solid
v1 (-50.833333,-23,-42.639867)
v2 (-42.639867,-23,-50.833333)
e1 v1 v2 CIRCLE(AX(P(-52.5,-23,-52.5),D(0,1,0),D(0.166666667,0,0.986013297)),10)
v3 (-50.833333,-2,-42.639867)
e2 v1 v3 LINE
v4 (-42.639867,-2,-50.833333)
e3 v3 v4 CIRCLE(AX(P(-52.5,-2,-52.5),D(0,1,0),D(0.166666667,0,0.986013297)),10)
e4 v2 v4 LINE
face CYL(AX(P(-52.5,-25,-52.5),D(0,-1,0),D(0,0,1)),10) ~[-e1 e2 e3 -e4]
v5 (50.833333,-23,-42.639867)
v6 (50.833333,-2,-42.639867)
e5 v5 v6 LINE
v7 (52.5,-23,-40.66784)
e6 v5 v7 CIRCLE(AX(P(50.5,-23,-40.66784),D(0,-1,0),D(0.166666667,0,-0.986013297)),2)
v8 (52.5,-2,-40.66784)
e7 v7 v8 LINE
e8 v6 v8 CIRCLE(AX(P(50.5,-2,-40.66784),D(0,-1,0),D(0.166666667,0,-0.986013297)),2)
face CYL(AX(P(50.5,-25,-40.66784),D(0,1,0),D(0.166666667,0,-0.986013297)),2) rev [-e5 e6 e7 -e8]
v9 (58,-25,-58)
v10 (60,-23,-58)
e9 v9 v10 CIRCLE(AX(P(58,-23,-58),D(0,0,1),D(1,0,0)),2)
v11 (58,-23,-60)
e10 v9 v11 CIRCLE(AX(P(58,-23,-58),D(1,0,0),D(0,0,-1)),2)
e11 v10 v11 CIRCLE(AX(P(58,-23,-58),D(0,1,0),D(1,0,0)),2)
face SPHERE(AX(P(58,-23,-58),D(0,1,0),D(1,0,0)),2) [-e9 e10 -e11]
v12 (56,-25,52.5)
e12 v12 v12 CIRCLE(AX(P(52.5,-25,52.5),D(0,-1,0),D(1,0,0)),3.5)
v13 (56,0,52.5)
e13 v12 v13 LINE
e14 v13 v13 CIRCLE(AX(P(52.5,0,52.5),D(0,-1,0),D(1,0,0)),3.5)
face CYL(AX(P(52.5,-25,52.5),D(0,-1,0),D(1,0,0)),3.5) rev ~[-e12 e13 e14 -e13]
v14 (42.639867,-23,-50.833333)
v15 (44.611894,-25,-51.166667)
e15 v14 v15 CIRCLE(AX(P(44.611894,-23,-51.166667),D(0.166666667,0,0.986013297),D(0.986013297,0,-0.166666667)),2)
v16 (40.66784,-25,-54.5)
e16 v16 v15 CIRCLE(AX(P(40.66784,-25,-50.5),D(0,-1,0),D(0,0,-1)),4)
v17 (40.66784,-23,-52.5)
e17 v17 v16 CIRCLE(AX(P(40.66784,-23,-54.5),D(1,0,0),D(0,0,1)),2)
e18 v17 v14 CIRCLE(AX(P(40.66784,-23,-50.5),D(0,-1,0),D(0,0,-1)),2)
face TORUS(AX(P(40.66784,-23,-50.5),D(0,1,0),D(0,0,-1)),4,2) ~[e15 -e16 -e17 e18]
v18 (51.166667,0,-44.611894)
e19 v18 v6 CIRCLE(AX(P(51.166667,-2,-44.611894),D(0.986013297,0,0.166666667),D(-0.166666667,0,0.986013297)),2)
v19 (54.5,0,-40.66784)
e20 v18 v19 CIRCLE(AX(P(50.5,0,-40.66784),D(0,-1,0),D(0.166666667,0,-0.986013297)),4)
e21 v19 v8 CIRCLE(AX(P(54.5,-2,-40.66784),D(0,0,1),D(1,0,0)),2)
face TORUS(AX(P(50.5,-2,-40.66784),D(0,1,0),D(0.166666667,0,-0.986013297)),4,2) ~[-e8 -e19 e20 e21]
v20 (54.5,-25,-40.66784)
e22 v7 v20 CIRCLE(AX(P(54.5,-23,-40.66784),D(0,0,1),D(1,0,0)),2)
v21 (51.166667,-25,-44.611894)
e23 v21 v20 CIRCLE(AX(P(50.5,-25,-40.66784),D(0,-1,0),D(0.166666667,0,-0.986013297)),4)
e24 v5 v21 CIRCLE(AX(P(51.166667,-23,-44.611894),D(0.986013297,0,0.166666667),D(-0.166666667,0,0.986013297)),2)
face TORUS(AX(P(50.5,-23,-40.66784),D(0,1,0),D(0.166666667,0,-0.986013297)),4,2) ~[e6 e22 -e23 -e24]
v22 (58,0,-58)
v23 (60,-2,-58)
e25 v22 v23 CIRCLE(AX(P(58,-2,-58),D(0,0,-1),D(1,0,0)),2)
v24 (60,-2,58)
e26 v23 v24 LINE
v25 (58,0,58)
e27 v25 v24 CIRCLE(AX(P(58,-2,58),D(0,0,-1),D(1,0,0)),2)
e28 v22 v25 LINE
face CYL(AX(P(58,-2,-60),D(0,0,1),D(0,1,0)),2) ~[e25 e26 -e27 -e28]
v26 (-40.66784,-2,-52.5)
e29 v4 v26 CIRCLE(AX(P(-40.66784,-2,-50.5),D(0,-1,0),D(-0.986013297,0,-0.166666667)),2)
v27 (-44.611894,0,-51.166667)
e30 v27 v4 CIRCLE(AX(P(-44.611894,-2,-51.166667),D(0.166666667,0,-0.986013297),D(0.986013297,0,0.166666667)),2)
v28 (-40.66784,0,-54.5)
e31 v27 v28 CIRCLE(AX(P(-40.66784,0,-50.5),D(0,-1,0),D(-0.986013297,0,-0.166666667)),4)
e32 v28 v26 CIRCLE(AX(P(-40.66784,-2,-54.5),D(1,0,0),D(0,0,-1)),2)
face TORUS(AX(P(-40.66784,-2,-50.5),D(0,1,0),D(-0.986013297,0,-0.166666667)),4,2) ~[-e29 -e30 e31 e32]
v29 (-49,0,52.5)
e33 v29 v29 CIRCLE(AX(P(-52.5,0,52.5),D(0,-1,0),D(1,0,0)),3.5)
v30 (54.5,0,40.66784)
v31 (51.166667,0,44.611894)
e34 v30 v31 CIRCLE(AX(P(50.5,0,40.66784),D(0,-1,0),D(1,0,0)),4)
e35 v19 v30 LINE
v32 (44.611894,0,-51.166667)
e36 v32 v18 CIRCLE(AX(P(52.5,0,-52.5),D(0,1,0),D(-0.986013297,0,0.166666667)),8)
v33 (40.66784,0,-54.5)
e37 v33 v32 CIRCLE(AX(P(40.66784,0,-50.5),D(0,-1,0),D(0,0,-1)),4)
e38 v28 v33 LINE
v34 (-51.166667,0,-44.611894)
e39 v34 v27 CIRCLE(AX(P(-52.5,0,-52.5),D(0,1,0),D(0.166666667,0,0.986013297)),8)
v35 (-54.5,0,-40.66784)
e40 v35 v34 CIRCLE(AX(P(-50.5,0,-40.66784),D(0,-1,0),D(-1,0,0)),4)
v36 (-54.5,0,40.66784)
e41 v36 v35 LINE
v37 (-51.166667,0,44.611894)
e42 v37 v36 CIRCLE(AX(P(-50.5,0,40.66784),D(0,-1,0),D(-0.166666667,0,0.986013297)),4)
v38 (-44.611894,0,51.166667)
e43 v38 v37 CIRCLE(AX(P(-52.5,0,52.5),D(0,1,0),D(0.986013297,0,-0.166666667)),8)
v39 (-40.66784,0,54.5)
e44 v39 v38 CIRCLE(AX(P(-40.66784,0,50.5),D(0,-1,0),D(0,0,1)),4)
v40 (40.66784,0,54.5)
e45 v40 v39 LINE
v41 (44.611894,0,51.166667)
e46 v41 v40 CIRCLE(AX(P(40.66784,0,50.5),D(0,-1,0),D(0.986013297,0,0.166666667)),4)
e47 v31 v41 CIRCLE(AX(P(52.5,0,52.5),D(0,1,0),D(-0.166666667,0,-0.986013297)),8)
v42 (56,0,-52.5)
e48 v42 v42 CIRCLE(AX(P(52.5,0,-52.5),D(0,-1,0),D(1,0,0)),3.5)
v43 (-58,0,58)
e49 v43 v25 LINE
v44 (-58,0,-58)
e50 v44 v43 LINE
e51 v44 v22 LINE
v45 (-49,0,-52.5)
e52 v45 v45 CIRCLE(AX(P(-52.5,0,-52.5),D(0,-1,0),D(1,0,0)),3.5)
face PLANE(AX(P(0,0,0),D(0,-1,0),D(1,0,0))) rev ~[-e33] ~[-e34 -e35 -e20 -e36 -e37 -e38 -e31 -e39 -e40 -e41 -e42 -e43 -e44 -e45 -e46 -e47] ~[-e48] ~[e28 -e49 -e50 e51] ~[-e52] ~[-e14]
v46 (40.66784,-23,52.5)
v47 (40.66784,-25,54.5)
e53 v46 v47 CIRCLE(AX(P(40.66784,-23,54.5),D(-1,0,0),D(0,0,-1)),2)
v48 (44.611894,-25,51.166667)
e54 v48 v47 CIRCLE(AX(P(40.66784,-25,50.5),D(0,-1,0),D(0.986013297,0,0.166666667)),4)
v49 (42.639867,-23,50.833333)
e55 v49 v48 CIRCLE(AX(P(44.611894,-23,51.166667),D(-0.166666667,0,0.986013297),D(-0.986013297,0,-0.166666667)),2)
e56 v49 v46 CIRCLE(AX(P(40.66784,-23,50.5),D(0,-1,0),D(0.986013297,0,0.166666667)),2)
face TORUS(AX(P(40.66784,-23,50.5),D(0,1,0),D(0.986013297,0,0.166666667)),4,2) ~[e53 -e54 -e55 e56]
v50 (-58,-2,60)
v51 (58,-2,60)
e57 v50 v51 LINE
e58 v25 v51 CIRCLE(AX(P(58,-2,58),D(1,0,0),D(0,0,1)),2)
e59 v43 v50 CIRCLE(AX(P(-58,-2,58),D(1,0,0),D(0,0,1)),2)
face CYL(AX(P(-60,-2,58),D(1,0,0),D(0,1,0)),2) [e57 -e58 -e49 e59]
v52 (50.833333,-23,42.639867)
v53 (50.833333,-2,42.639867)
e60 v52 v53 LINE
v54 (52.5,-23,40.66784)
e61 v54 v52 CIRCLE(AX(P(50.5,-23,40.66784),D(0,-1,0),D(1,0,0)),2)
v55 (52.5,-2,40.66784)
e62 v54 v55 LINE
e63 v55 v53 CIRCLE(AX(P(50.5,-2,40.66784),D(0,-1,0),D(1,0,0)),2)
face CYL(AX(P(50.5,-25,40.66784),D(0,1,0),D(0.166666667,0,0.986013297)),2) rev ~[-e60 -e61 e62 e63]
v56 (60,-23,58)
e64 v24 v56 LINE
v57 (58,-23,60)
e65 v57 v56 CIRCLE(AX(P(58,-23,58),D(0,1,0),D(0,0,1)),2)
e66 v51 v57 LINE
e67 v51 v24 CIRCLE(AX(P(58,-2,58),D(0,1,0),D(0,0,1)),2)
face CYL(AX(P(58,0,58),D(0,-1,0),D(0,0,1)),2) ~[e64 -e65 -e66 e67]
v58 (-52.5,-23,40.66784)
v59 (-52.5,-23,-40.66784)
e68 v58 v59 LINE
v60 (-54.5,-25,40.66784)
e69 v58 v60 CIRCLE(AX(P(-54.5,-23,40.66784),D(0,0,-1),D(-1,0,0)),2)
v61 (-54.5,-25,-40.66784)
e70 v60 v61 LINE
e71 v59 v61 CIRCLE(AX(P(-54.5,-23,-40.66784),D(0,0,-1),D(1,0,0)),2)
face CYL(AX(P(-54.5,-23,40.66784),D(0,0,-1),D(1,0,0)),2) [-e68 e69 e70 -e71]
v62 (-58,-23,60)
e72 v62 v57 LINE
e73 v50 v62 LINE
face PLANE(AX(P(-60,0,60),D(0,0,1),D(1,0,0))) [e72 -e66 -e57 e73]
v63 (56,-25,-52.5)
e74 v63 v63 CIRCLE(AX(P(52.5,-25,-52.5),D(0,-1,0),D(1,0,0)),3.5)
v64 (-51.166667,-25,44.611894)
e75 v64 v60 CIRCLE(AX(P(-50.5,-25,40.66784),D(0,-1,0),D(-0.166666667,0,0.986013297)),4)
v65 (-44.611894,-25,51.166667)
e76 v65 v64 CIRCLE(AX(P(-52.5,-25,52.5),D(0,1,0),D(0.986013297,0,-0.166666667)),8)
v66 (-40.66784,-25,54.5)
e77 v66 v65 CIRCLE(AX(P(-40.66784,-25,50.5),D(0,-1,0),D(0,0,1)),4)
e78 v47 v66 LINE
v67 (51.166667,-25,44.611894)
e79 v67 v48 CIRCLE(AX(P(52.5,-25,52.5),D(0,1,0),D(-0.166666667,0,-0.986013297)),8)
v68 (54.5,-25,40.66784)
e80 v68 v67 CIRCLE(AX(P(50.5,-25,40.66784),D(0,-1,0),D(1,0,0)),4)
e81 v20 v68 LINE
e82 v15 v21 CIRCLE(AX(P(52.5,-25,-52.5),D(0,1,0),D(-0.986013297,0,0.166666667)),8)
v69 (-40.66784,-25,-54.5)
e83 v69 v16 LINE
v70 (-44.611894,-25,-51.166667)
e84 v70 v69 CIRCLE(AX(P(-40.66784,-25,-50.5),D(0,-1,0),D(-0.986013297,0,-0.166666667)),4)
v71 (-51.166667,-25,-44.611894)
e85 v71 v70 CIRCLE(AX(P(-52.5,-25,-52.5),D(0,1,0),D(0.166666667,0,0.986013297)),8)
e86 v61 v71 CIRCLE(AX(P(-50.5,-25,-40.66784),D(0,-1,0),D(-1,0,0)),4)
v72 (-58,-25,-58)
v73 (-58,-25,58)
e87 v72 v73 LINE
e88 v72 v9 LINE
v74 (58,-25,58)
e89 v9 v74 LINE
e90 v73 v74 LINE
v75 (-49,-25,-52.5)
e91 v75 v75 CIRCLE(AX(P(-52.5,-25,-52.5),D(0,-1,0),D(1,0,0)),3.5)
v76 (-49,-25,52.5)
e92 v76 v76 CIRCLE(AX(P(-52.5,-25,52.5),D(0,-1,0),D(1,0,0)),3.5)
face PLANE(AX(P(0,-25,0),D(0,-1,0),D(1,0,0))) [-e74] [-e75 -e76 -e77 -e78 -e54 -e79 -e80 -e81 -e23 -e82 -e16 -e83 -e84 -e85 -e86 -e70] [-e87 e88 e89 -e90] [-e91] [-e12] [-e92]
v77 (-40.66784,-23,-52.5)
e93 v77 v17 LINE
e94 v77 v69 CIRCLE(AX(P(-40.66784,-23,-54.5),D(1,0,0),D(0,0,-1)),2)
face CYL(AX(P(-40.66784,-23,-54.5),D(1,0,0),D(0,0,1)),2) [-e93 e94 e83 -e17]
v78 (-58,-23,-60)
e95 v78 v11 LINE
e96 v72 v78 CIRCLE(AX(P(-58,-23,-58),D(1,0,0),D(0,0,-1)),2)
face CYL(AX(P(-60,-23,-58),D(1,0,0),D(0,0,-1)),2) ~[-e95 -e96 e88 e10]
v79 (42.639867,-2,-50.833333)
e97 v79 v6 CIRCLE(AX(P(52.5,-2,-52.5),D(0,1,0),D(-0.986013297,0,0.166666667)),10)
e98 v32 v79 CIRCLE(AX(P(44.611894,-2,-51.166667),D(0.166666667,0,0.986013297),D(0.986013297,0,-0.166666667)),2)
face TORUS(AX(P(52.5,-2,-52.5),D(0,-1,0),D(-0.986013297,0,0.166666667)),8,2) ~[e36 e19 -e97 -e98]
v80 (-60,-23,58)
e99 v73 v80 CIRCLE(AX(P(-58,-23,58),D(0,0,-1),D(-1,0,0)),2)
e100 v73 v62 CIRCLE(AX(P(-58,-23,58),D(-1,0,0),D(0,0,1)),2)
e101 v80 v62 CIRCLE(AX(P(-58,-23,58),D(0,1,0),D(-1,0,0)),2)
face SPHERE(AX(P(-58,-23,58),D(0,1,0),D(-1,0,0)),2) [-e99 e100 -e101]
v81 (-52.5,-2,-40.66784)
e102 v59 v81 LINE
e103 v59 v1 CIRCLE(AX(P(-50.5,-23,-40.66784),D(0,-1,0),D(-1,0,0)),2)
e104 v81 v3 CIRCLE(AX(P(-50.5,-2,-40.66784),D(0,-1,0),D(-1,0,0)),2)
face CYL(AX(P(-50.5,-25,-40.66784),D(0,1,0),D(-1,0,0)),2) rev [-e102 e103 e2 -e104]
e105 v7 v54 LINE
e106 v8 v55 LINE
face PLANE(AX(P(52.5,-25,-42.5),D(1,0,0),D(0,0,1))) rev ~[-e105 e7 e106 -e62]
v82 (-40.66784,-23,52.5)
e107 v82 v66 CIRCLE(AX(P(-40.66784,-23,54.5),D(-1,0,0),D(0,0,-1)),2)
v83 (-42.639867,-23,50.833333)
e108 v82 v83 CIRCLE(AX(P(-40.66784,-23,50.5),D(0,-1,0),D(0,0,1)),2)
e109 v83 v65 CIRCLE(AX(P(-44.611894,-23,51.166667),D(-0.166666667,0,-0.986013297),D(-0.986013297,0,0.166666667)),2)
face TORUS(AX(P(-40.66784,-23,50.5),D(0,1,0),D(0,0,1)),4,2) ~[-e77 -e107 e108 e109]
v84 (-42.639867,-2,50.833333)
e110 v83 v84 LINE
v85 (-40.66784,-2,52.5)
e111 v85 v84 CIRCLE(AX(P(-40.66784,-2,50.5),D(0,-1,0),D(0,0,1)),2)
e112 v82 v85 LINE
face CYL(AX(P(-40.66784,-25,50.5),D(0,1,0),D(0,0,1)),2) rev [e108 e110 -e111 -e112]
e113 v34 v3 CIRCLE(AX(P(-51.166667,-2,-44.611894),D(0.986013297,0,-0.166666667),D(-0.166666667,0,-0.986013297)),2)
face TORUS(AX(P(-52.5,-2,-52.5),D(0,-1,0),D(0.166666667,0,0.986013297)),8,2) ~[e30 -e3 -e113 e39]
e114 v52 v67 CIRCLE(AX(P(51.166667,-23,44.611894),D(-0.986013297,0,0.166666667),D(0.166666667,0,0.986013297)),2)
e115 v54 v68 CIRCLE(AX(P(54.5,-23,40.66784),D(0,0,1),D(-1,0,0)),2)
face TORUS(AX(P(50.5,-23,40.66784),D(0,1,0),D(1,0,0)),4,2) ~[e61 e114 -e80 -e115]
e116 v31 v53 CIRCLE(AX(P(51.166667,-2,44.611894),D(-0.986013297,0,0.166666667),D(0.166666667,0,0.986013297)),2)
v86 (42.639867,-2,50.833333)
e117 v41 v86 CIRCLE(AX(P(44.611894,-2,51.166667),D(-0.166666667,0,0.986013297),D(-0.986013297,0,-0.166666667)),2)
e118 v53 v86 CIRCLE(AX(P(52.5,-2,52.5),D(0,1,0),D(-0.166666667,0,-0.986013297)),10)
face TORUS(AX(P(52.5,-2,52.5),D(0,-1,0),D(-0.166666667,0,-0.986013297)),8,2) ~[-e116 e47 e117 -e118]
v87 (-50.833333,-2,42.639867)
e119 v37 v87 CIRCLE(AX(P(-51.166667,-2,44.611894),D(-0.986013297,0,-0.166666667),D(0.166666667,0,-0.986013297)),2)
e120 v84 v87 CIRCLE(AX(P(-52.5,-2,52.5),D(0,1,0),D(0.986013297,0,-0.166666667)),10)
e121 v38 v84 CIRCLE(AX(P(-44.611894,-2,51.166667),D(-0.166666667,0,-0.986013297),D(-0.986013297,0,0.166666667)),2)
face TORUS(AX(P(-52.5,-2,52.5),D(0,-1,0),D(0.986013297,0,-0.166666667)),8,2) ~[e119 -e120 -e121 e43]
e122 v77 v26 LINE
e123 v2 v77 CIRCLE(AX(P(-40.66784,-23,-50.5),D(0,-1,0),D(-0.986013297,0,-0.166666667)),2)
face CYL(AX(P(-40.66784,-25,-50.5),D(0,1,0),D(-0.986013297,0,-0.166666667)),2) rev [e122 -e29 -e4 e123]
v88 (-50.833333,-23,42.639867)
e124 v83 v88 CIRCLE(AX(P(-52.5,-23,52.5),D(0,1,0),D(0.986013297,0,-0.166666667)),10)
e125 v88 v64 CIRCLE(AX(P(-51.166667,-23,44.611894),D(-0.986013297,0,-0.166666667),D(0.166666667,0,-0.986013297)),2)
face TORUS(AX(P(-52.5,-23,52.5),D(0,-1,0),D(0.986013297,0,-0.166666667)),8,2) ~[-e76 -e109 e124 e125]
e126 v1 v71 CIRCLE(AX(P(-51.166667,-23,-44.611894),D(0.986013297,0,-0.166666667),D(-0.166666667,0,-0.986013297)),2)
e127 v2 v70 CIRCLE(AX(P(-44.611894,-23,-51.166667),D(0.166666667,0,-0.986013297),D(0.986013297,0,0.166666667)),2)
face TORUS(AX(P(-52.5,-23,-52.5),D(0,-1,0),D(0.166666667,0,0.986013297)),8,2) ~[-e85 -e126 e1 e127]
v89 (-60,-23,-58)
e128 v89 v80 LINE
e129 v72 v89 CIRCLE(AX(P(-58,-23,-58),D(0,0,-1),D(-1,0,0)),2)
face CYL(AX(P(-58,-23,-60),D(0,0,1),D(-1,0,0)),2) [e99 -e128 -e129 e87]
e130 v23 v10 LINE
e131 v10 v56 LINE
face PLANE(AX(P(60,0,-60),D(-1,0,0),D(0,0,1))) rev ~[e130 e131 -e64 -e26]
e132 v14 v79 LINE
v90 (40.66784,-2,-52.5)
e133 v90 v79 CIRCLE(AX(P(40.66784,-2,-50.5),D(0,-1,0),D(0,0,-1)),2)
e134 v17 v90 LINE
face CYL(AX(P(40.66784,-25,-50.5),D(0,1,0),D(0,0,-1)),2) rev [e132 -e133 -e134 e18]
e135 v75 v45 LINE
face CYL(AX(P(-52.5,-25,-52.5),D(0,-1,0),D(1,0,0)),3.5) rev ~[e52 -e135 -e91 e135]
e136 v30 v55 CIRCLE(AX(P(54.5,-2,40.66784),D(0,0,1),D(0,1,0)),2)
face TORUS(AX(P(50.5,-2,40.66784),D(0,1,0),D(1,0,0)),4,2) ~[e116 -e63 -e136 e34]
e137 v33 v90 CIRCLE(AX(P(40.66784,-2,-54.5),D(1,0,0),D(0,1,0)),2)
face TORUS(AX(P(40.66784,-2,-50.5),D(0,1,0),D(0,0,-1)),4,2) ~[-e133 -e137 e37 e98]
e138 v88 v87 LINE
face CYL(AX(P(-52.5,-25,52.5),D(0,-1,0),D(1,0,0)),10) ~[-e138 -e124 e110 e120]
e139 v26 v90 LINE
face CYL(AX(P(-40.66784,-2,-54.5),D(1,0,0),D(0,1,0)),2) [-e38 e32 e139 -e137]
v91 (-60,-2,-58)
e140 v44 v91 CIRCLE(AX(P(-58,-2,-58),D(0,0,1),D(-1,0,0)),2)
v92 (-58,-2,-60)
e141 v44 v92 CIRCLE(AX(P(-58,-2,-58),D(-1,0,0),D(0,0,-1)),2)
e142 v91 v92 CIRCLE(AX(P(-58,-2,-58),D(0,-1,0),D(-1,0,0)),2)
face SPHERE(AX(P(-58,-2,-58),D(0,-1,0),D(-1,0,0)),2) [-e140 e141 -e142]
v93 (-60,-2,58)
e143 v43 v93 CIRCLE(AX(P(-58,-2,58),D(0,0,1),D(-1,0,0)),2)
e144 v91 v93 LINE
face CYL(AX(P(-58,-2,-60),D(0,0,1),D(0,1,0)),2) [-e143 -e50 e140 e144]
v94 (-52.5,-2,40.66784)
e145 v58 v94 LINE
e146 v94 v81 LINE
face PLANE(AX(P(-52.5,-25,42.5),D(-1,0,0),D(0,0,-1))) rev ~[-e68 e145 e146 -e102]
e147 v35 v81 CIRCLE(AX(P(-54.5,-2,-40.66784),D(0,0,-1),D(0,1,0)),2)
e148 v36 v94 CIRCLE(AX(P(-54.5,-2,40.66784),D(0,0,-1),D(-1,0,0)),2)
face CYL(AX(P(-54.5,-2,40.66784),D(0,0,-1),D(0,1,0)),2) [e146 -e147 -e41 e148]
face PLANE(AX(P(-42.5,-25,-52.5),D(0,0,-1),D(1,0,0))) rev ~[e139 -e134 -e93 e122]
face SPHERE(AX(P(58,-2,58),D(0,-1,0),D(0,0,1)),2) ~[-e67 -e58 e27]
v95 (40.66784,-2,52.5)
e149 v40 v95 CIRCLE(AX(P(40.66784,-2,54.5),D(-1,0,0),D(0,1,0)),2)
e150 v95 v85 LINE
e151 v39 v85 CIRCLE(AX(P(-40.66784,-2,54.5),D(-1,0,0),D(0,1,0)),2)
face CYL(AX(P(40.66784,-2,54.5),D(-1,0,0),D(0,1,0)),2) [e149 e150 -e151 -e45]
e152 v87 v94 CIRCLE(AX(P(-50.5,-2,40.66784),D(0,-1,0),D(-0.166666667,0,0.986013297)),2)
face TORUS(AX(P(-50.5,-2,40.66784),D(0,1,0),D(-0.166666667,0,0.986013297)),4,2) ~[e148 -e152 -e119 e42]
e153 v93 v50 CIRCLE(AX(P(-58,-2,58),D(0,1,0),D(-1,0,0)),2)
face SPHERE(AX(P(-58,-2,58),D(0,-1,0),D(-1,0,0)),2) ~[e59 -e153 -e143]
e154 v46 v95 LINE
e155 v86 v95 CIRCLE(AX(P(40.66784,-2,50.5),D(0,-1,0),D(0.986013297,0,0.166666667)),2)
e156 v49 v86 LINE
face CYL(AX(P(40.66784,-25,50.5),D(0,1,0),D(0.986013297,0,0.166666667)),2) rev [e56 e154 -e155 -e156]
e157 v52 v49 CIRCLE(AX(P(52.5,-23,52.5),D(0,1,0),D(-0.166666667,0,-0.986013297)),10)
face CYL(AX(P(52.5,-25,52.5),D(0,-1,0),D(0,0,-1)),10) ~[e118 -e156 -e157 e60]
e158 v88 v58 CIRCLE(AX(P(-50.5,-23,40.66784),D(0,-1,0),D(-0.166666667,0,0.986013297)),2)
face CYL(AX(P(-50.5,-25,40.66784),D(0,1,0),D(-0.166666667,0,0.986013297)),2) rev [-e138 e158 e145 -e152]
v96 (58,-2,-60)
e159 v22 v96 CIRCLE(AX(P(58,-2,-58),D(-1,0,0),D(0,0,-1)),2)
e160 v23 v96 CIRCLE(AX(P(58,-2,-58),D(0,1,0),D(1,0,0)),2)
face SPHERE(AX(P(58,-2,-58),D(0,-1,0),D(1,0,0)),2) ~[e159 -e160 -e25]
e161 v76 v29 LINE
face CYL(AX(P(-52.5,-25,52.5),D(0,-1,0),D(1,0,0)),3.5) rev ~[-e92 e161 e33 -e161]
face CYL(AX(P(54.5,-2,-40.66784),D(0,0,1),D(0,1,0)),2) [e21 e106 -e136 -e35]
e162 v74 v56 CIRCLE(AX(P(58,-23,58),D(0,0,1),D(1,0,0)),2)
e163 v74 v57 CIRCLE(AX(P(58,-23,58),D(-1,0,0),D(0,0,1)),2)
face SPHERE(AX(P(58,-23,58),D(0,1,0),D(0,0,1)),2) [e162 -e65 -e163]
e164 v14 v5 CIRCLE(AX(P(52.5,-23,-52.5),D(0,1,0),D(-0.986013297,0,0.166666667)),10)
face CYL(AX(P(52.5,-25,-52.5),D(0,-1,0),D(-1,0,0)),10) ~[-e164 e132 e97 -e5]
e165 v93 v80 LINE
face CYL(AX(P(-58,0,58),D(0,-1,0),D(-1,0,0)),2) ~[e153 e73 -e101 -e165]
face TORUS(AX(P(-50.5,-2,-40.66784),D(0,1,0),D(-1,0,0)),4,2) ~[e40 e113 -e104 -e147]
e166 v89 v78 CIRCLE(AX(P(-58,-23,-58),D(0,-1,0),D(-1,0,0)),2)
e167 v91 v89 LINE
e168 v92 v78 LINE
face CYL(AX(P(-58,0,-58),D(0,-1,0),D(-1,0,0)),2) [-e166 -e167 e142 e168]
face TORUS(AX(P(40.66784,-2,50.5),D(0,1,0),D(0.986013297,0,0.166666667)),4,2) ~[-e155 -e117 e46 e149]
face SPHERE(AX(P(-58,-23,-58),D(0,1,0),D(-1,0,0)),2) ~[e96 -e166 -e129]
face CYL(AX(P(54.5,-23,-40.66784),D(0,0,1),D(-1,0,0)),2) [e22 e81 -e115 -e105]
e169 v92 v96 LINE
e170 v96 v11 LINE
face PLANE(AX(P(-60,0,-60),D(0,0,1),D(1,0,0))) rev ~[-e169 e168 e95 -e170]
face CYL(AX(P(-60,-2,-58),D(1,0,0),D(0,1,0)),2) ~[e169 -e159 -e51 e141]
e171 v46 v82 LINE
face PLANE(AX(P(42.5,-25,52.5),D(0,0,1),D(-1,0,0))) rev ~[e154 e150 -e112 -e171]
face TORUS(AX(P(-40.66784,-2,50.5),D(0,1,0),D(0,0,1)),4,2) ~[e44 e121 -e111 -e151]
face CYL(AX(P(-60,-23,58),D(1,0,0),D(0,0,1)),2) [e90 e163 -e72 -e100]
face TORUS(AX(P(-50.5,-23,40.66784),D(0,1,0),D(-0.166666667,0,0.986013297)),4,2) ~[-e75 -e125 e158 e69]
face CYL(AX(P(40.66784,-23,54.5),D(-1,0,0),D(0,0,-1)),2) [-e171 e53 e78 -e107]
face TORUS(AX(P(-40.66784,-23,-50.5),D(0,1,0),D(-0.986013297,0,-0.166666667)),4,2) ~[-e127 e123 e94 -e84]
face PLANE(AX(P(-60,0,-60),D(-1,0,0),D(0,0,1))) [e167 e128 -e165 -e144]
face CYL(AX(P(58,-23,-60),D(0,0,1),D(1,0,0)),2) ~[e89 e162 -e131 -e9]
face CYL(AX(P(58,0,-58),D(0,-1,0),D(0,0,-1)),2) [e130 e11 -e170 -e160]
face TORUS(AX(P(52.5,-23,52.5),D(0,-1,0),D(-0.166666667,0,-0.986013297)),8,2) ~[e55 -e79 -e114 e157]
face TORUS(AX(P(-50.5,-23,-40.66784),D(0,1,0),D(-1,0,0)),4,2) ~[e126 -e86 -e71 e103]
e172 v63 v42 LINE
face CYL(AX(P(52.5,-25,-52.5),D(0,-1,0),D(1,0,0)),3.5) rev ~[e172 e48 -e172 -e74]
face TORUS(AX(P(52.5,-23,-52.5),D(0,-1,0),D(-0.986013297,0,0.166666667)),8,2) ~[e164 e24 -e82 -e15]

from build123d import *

# Parameters (mm, degrees)
F0_W     = 120
F0_H     = 120
F1_DEPTH = 25
F2_R     = 3.5
F3_DEPTH = 25
F5_DEPTH = 25
F6_F1_R  = 2
F6_F2_R  = 2


with BuildPart() as f1:
    # F0 (on Front) → F1 (new body)
    with BuildSketch(Plane.XZ):
        Rectangle(F0_W, F0_H)
    extrude(amount=F1_DEPTH)

    # F2 (on face) → F3 (cut)
    with BuildSketch(Plane.XZ.offset(25)):
        with Locations((-52.5, 52.5)):
            Circle(F2_R)
        with Locations((-52.5, -52.5)):
            Circle(F2_R)
        with Locations((52.5, -52.5)):
            Circle(F2_R)
        with Locations((52.5, 52.5)):
            Circle(F2_R)
    extrude(amount=-F3_DEPTH, mode=Mode.SUBTRACT)

    # F4 (on face) → F5 (cut)
    with BuildSketch(Plane.XZ.offset(25)):
        with BuildLine():
            ThreePointArc((52.5, 42.5), (45.4289321881, 45.4289321881), (42.5, 52.5))
            Line((42.5, 52.5), (-42.5, 52.5))
            ThreePointArc((-42.5, 52.5), (-45.4289321881, 45.4289321881), (-52.5, 42.5))
            Line((-52.5, 42.5), (-52.5, -42.5))
            ThreePointArc((-52.5, -42.5), (-45.4289321881, -45.4289321881), (-42.5, -52.5))
            Line((-42.5, -52.5), (42.5, -52.5))
            ThreePointArc((42.5, -52.5), (45.4289321881, -45.4289321881), (52.5, -42.5))
            Line((52.5, -42.5), (52.5, 42.5))
        make_face()
    extrude(amount=-F5_DEPTH, mode=Mode.SUBTRACT)

    # F6: fillet of radius 2 on 28 edges, made by hand

    # F6_f1
    f6_f1_edges = [f1.edges().sort_by_distance(p)[0] for p in [
        (42.5, -12.5, 52.5),
        (-42.5, -12.5, 52.5),
        (-52.5, -12.5, 42.5),
        (-52.5, -12.5, -42.5),
        (52.5, -12.5, -42.5),
        (52.5, -12.5, 42.5),
        (-42.5, -12.5, -52.5),
        (42.5, -12.5, -52.5),
    ]]
    fillet(f6_f1_edges, radius=F6_F1_R)

    # F6_f2
    f6_f2_edges = [f1.edges().sort_by_distance(p)[0] for p in [
        (-60, -12.5, 60),
        (-60, -12.5, -60),
        (-60, 0, 0),
        (-60, -25, 0),
        (60, -12.5, 60),
        (0, 0, 60),
        (0, -25, 60),
        (60, -12.5, -60),
        (60, 0, 0),
        (60, -25, 0),
        (0, 0, -60),
        (0, -25, -60),
        (0, -25, 52.5),
        (0, 0, 52.5),
        (-52.5, -25, 0),
        (-52.5, 0, 0),
        (52.5, -25, 0),
        (52.5, 0, 0),
        (0, -25, -52.5),
        (0, 0, -52.5),
        (-41.9588348825, 0, -52.0275252317),
        (41.9588348825, 0, -52.0275252317),
        (-41.9588348825, -25, -52.0275252317),
        (41.9588348825, -25, -52.0275252317),
        (52.0275252317, 0, -41.9588348825),
        (52.0275252317, 0, 41.9588348825),
        (52.0275252317, -25, -41.9588348825),
        (52.0275252317, -25, 41.9588348825),
        (-52.0275252317, 0, 41.9588348825),
        (-52.0275252317, 0, -41.9588348825),
        (-52.0275252317, -25, 41.9588348825),
        (-52.0275252317, -25, -41.9588348825),
        (41.9588348825, 0, 52.0275252317),
        (-41.9588348825, 0, 52.0275252317),
        (41.9588348825, -25, 52.0275252317),
        (-41.9588348825, -25, 52.0275252317),
    ]]
    fillet(f6_f2_edges, radius=F6_F2_R)


solid = f1.part
